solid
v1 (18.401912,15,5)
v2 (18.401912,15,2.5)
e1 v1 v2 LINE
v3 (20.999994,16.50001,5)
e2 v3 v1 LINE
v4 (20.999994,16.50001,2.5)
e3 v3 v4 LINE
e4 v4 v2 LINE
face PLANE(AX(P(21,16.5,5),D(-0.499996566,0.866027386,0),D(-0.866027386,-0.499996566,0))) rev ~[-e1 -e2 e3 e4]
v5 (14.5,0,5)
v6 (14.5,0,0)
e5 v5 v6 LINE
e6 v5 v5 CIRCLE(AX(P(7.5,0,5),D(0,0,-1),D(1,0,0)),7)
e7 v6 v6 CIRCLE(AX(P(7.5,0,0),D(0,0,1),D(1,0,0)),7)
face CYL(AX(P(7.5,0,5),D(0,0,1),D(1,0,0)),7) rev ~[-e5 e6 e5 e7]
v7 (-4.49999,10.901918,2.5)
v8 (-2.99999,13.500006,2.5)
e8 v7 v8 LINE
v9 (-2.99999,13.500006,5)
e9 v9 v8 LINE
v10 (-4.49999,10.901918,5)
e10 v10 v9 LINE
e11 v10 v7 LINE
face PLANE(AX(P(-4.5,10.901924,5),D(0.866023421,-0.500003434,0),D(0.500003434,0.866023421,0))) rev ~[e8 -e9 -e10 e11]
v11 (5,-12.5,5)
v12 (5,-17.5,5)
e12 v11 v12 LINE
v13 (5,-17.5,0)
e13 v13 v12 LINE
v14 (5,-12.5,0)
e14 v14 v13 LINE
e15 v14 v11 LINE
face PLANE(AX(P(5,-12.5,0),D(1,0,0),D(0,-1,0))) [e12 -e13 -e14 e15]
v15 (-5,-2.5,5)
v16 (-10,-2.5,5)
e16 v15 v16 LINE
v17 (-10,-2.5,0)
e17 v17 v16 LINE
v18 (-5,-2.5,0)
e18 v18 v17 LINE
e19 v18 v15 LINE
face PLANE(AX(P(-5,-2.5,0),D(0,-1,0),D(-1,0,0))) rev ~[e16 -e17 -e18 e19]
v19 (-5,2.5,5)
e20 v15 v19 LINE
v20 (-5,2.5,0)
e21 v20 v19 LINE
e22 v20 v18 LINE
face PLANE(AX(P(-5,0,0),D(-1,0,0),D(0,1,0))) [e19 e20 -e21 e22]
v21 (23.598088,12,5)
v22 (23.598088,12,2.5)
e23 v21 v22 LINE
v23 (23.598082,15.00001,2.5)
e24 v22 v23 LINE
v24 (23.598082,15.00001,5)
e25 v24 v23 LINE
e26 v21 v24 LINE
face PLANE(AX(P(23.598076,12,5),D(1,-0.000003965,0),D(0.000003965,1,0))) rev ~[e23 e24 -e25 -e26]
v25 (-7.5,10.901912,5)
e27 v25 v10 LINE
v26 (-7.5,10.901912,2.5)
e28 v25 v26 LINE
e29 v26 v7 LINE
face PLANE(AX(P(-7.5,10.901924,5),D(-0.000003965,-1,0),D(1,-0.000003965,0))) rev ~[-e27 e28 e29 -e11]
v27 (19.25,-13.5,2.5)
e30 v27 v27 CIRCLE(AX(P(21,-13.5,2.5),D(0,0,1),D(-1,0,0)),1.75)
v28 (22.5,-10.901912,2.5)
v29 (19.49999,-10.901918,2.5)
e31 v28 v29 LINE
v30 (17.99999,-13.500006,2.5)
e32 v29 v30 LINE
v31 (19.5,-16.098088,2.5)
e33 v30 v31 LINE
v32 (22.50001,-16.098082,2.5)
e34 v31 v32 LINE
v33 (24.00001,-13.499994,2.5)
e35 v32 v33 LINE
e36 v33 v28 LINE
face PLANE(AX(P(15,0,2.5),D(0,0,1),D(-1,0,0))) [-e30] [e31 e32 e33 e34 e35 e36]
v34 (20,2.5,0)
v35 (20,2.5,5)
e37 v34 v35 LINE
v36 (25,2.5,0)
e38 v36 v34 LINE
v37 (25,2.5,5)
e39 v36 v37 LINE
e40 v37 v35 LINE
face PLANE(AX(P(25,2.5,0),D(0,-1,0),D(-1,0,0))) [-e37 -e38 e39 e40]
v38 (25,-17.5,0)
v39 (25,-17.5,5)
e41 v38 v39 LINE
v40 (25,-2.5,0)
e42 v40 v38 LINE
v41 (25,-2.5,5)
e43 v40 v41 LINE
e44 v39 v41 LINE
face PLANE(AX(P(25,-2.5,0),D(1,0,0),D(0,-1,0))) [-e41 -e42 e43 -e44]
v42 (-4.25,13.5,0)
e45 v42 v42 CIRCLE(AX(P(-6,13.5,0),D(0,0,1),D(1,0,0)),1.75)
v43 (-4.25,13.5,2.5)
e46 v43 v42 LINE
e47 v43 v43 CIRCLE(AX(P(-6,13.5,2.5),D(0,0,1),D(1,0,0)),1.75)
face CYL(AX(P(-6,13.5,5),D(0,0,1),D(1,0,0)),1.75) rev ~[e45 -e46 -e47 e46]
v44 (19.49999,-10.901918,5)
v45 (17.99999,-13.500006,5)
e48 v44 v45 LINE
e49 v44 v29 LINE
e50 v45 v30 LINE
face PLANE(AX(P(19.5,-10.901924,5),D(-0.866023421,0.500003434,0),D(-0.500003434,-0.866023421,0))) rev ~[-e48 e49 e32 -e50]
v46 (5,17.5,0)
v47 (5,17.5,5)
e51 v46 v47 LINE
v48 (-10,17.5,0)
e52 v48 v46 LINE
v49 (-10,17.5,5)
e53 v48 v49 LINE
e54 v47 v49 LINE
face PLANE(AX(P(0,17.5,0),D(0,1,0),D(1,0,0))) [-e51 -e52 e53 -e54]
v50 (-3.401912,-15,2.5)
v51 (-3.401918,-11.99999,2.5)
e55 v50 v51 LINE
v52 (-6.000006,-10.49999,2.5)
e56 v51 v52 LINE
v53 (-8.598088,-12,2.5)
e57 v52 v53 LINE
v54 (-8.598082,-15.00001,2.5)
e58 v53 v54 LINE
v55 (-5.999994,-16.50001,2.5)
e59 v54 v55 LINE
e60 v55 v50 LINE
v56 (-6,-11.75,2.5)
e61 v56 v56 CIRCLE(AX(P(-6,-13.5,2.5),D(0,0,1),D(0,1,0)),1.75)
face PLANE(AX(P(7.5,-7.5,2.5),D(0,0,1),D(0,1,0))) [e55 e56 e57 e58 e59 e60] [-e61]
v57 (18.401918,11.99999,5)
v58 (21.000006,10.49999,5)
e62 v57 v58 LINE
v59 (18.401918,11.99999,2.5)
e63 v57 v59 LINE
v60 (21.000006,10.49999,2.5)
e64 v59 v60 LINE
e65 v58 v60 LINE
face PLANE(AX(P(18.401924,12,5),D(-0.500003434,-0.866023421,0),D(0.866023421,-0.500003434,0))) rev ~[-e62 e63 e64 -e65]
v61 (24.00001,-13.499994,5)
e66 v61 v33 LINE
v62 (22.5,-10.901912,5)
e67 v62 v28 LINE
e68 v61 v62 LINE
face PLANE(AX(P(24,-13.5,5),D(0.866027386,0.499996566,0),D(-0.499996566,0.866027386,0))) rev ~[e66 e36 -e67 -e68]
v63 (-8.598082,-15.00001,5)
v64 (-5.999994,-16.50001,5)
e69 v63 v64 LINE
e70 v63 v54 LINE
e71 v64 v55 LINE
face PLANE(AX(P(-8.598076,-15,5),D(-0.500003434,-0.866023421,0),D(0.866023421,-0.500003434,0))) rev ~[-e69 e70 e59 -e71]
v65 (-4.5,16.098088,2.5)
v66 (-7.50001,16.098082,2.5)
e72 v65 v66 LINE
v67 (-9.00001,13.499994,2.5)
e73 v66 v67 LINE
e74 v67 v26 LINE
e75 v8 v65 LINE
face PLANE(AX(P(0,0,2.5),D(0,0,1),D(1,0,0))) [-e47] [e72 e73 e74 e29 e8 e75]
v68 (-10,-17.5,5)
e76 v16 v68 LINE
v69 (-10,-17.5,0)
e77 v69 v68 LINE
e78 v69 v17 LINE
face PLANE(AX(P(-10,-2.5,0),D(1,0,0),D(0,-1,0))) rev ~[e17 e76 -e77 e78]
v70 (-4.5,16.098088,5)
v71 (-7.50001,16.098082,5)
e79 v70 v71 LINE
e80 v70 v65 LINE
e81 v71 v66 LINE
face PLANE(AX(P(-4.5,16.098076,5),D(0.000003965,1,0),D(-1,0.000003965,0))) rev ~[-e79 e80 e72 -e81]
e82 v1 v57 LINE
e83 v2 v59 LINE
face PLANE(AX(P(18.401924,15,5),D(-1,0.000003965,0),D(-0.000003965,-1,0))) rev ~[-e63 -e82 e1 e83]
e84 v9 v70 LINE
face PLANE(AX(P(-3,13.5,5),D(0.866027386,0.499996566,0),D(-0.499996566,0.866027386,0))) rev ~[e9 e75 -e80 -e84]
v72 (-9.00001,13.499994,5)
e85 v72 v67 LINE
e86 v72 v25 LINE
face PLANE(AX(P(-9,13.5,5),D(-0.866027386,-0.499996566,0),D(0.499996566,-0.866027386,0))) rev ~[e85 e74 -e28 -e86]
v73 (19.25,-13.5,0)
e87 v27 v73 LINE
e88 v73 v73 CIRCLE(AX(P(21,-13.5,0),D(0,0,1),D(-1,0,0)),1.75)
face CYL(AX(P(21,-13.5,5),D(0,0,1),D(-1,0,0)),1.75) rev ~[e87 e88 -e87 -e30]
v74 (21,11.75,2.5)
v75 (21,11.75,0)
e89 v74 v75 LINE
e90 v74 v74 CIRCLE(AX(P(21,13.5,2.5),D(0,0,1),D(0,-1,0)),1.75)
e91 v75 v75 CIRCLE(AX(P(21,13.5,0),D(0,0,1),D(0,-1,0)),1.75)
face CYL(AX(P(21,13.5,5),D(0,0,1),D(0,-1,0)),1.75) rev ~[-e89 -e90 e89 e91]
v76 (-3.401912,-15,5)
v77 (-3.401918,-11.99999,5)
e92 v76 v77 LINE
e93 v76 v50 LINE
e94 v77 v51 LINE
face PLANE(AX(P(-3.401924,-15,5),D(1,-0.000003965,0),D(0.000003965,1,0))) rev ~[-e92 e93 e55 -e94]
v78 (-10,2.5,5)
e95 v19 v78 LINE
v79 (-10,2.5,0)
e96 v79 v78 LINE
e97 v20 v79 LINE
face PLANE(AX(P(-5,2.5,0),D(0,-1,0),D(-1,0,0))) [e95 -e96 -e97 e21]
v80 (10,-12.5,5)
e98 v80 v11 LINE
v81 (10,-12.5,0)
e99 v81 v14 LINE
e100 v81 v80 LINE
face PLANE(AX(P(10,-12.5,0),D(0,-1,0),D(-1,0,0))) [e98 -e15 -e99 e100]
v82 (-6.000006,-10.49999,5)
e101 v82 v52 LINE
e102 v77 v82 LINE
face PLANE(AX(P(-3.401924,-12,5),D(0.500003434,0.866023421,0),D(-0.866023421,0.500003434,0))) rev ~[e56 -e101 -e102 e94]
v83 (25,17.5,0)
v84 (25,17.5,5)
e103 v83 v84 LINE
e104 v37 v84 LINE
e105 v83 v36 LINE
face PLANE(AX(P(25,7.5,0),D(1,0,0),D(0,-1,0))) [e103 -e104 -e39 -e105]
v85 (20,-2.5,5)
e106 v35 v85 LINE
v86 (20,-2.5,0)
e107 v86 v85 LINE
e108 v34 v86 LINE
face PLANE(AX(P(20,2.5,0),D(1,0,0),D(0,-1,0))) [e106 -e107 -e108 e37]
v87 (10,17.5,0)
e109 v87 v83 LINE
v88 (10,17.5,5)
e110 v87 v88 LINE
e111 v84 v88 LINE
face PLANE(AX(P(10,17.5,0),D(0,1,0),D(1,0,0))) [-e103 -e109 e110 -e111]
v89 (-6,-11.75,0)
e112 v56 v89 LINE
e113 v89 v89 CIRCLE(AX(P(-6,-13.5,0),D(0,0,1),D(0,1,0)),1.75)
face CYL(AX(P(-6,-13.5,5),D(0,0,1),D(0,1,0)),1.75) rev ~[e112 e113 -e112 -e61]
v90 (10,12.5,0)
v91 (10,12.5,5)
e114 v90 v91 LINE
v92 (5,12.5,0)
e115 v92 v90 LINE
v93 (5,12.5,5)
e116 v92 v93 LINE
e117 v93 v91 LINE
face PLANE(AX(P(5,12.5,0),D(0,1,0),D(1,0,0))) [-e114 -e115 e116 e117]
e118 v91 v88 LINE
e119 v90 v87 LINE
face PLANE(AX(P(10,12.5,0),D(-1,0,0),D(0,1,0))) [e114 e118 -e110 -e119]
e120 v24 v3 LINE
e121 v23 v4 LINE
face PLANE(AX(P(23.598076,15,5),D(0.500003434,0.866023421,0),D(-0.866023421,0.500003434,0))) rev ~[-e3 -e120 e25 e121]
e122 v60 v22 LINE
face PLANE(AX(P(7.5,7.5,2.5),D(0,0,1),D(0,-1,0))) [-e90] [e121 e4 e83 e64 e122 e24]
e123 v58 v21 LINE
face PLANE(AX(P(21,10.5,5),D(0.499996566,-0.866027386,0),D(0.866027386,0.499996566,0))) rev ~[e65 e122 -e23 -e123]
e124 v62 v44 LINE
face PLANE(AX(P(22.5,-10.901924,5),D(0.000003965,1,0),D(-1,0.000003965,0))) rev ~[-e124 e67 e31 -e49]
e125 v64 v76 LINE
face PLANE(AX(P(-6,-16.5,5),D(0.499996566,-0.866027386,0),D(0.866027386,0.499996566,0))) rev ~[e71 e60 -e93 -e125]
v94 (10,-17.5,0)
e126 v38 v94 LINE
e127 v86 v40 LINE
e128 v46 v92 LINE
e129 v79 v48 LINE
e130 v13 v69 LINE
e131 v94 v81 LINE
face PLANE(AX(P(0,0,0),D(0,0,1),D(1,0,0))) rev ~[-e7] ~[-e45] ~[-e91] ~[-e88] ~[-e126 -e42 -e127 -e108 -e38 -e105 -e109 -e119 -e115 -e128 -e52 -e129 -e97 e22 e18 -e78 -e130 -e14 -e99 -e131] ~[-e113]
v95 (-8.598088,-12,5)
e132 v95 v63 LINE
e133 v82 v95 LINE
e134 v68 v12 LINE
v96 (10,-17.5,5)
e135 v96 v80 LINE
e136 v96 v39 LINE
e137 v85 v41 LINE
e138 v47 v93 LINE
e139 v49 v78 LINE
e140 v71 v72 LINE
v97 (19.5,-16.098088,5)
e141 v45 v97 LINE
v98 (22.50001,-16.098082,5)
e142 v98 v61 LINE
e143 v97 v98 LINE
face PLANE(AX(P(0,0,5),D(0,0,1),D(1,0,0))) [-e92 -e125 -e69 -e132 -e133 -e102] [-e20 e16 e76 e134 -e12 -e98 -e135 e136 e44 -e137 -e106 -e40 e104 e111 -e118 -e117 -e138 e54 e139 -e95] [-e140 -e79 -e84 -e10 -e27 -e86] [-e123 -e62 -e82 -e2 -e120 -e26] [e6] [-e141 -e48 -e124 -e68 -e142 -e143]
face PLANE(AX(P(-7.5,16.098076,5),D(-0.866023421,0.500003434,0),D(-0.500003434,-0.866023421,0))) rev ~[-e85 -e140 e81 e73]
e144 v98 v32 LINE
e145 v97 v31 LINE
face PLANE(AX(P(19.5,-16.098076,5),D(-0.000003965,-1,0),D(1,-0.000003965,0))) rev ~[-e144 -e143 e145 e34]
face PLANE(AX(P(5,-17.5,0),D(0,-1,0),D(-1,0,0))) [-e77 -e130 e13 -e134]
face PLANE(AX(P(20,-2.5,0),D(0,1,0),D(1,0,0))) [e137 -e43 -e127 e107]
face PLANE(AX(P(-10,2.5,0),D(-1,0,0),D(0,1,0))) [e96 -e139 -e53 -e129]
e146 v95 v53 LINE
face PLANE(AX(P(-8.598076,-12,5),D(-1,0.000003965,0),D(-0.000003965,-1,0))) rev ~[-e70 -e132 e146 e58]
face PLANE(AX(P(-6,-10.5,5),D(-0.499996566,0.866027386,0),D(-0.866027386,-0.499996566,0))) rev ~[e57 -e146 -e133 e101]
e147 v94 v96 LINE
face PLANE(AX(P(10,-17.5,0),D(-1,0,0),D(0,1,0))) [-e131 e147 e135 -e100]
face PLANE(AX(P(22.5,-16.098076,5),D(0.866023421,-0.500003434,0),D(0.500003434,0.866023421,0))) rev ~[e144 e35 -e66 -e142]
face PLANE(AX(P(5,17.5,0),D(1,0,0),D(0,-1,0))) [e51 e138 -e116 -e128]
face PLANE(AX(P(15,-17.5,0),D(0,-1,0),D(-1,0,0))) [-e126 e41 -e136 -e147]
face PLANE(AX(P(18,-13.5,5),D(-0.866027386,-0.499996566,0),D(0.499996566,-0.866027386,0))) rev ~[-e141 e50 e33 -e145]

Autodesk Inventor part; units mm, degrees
ref_plane "YZ Plane" through (0, 0, 0) normal (1, 0, 0) x (0, 1, 0)
ref_plane "XZ Plane" through (0, 0, 0) normal (0, 1, 0) x (-1, 0, 0)
ref_plane "XY Plane" through (0, 0, 0) normal (0, 0, 1) x (1, 0, 0)
sketch "Sketch1" plane through (0, 0, 0) normal (0, 0, 1) x (1, 0, 0)
  line L0 (0, 0) -> (-5, 0)
  line L1 (-5, 0) -> (-5, 2.5)
  line L2 (-5, 2.5) -> (-10, 2.5)
  line L3 (-10, 2.5) -> (-10, 7.5)
  line L4 (-10, 7.5) -> (-5, 7.5)
  line L5 (-5, 7.5) -> (-5, 12.5)
  line L6 (-5, 12.5) -> (0, 12.5)
  line L7 (-5, 0) -> (-5, -2.5)
  line L8 (-5, -2.5) -> (-10, -2.5)
  line L9 (-10, -2.5) -> (-10, -7.5)
  line L10 (-10, -7.5) -> (-5, -7.5)
  line L11 (-5, -7.5) -> (-5, -12.5)
  line L12 (-5, -12.5) -> (0, -12.5)
  line L13 (0, 12.5) -> (0, 17.5)
  line L14 (0, 17.5) -> (5, 17.5)
  line L15 (5, 17.5) -> (5, 12.5)
  line L16 (5, 12.5) -> (10, 12.5)
  line L17 (10, 12.5) -> (10, 17.5)
  line L18 (10, 17.5) -> (15, 17.5)
  line L19 (15, 17.5) -> (15, 12.5)
  line L20 (15, 12.5) -> (20, 12.5)
  line L21 (20, 12.5) -> (20, 7.5)
  line L22 (20, 7.5) -> (25, 7.5)
  line L23 (25, 7.5) -> (25, 2.5)
  line L24 (25, 2.5) -> (20, 2.5)
  line L25 (20, 2.5) -> (20, -2.5)
  line L26 (20, -2.5) -> (25, -2.5)
  line L27 (25, -2.5) -> (25, -7.5)
  line L28 (25, -7.5) -> (20, -7.5)
  line L29 (20, -7.5) -> (20, -12.5)
  line L30 (20, -12.5) -> (15, -12.5)
  line L31 (15, -12.5) -> (15, -17.5)
  line L32 (15, -17.5) -> (10, -17.5)
  line L33 (10, -17.5) -> (10, -12.5)
  line L34 (10, -12.5) -> (5, -12.5)
  line L35 (5, -12.5) -> (5, -17.5)
  line L36 (5, -17.5) -> (0, -17.5)
  line L37 (0, -17.5) -> (0, -12.5)
  line L38 (0, 17.5) -> (-10, 17.5)
  line L39 (-10, 17.5) -> (-10, 7.5)
  line L40 (15, 17.5) -> (25, 17.5)
  line L41 (25, 17.5) -> (25, 7.5)
  line L42 (25, -7.5) -> (25, -17.5)
  line L43 (25, -17.5) -> (15, -17.5)
  line L44 (0, -17.5) -> (-10, -17.5)
  line L45 (-10, -7.5) -> (-10, -17.5)
  dimension "d0" = 5
  dimension "d1" = 2.5
  dimension "d2" = 5
  dimension "d3" = 5
  dimension "d4" = 5
  dimension "d5" = 5
  dimension "d6" = 5
  dimension "d7" = 2.5
  dimension "d8" = 5
  dimension "d9" = 5
  dimension "d10" = 5
  dimension "d11" = 5
  dimension "d12" = 5
  dimension "d13" = 5
  dimension "d14" = 5
  dimension "d15" = 5
  dimension "d16" = 5
  dimension "d17" = 5
  dimension "d18" = 5
  dimension "d19" = 5
  dimension "d20" = 5
  dimension "d21" = 5
  dimension "d22" = 5
  dimension "d23" = 5
  dimension "d24" = 5
  dimension "d25" = 5
  dimension "d26" = 5
  dimension "d27" = 5
  dimension "d28" = 5
  dimension "d29" = 5
  dimension "d30" = 5
  dimension "d31" = 5
  dimension "d32" = 5
extrude "Extrusion1" add sketch "Sketch1" along normal blind 5
sketch "Sketch4" plane through (0, 0, 5) normal (0, 0, 1) x (1, 0, 0)
  line L0 (-10, 17.5) -> (-10, 13.5)
  line L1 (-10, 17.5) -> (-10, 2.5) projected
  line L2 (-10, 13.5) -> (-6, 13.5)
  circle A0 centre (-6, 13.5) radius 1.75
  point P0 (0, 0)
  dimension "d54" = 4
  dimension "d55" = 4
  dimension "d56" = 3.5
extrude "Extrusion4" cut sketch "Sketch4" against normal blind 10
sketch "Sketch5" plane through (0, 0, 5) normal (0, 0, 1) x (1, 0, 0)
  circle A0 centre (-6, 13.5) radius 1.75 projected
  line L0 (-6, 13.5) -> (-3, 13.5)
  line L1 (-3, 13.5) -> (-4.5, 16.0981)
  line L2 (-4.5, 16.0981) -> (-6, 13.5)
  point P0 (0, 0)
  dimension "d59" = 3
  dimension "d60" = 3
  dimension "d61" = 60
extrude "Extrusion5" cut sketch "Sketch5" against normal blind 2.5 contours L0 L2 A0 | A0 L2 L1 L0 picked at (-4.9952, 14.0801)
pattern_circular "Circular Pattern2" count 6 over 360 about axis through (-6, 13.5, 5) along (0, 0, -1) of "Extrusion5"
sketch "Sketch6" plane through (0, 0, 5) normal (0, 0, 1) x (1, 0, 0)
  line L0 (-5, -2.5) -> (-5, 2.5) projected
  line L1 (-5, 0) -> (20, 0)
  line L2 (20, 2.5) -> (20, -2.5) projected
  line L3 (5, 12.5) -> (10, 12.5) projected
  line L4 (7.5, 12.5) -> (7.5, 0)
  circle A0 centre (7.5, 0) radius 7
  point P0 (0, 0)
  dimension "d70" = 14
extrude "Extrusion6" cut sketch "Sketch6" against normal through all
pattern_circular "Circular Pattern4" count 4 over 360 about axis through (7.5, 0, 5) along (0, 0, -1) of "Extrusion5", "Circular Pattern2", "Extrusion4"
properties part number "crossCenter"
